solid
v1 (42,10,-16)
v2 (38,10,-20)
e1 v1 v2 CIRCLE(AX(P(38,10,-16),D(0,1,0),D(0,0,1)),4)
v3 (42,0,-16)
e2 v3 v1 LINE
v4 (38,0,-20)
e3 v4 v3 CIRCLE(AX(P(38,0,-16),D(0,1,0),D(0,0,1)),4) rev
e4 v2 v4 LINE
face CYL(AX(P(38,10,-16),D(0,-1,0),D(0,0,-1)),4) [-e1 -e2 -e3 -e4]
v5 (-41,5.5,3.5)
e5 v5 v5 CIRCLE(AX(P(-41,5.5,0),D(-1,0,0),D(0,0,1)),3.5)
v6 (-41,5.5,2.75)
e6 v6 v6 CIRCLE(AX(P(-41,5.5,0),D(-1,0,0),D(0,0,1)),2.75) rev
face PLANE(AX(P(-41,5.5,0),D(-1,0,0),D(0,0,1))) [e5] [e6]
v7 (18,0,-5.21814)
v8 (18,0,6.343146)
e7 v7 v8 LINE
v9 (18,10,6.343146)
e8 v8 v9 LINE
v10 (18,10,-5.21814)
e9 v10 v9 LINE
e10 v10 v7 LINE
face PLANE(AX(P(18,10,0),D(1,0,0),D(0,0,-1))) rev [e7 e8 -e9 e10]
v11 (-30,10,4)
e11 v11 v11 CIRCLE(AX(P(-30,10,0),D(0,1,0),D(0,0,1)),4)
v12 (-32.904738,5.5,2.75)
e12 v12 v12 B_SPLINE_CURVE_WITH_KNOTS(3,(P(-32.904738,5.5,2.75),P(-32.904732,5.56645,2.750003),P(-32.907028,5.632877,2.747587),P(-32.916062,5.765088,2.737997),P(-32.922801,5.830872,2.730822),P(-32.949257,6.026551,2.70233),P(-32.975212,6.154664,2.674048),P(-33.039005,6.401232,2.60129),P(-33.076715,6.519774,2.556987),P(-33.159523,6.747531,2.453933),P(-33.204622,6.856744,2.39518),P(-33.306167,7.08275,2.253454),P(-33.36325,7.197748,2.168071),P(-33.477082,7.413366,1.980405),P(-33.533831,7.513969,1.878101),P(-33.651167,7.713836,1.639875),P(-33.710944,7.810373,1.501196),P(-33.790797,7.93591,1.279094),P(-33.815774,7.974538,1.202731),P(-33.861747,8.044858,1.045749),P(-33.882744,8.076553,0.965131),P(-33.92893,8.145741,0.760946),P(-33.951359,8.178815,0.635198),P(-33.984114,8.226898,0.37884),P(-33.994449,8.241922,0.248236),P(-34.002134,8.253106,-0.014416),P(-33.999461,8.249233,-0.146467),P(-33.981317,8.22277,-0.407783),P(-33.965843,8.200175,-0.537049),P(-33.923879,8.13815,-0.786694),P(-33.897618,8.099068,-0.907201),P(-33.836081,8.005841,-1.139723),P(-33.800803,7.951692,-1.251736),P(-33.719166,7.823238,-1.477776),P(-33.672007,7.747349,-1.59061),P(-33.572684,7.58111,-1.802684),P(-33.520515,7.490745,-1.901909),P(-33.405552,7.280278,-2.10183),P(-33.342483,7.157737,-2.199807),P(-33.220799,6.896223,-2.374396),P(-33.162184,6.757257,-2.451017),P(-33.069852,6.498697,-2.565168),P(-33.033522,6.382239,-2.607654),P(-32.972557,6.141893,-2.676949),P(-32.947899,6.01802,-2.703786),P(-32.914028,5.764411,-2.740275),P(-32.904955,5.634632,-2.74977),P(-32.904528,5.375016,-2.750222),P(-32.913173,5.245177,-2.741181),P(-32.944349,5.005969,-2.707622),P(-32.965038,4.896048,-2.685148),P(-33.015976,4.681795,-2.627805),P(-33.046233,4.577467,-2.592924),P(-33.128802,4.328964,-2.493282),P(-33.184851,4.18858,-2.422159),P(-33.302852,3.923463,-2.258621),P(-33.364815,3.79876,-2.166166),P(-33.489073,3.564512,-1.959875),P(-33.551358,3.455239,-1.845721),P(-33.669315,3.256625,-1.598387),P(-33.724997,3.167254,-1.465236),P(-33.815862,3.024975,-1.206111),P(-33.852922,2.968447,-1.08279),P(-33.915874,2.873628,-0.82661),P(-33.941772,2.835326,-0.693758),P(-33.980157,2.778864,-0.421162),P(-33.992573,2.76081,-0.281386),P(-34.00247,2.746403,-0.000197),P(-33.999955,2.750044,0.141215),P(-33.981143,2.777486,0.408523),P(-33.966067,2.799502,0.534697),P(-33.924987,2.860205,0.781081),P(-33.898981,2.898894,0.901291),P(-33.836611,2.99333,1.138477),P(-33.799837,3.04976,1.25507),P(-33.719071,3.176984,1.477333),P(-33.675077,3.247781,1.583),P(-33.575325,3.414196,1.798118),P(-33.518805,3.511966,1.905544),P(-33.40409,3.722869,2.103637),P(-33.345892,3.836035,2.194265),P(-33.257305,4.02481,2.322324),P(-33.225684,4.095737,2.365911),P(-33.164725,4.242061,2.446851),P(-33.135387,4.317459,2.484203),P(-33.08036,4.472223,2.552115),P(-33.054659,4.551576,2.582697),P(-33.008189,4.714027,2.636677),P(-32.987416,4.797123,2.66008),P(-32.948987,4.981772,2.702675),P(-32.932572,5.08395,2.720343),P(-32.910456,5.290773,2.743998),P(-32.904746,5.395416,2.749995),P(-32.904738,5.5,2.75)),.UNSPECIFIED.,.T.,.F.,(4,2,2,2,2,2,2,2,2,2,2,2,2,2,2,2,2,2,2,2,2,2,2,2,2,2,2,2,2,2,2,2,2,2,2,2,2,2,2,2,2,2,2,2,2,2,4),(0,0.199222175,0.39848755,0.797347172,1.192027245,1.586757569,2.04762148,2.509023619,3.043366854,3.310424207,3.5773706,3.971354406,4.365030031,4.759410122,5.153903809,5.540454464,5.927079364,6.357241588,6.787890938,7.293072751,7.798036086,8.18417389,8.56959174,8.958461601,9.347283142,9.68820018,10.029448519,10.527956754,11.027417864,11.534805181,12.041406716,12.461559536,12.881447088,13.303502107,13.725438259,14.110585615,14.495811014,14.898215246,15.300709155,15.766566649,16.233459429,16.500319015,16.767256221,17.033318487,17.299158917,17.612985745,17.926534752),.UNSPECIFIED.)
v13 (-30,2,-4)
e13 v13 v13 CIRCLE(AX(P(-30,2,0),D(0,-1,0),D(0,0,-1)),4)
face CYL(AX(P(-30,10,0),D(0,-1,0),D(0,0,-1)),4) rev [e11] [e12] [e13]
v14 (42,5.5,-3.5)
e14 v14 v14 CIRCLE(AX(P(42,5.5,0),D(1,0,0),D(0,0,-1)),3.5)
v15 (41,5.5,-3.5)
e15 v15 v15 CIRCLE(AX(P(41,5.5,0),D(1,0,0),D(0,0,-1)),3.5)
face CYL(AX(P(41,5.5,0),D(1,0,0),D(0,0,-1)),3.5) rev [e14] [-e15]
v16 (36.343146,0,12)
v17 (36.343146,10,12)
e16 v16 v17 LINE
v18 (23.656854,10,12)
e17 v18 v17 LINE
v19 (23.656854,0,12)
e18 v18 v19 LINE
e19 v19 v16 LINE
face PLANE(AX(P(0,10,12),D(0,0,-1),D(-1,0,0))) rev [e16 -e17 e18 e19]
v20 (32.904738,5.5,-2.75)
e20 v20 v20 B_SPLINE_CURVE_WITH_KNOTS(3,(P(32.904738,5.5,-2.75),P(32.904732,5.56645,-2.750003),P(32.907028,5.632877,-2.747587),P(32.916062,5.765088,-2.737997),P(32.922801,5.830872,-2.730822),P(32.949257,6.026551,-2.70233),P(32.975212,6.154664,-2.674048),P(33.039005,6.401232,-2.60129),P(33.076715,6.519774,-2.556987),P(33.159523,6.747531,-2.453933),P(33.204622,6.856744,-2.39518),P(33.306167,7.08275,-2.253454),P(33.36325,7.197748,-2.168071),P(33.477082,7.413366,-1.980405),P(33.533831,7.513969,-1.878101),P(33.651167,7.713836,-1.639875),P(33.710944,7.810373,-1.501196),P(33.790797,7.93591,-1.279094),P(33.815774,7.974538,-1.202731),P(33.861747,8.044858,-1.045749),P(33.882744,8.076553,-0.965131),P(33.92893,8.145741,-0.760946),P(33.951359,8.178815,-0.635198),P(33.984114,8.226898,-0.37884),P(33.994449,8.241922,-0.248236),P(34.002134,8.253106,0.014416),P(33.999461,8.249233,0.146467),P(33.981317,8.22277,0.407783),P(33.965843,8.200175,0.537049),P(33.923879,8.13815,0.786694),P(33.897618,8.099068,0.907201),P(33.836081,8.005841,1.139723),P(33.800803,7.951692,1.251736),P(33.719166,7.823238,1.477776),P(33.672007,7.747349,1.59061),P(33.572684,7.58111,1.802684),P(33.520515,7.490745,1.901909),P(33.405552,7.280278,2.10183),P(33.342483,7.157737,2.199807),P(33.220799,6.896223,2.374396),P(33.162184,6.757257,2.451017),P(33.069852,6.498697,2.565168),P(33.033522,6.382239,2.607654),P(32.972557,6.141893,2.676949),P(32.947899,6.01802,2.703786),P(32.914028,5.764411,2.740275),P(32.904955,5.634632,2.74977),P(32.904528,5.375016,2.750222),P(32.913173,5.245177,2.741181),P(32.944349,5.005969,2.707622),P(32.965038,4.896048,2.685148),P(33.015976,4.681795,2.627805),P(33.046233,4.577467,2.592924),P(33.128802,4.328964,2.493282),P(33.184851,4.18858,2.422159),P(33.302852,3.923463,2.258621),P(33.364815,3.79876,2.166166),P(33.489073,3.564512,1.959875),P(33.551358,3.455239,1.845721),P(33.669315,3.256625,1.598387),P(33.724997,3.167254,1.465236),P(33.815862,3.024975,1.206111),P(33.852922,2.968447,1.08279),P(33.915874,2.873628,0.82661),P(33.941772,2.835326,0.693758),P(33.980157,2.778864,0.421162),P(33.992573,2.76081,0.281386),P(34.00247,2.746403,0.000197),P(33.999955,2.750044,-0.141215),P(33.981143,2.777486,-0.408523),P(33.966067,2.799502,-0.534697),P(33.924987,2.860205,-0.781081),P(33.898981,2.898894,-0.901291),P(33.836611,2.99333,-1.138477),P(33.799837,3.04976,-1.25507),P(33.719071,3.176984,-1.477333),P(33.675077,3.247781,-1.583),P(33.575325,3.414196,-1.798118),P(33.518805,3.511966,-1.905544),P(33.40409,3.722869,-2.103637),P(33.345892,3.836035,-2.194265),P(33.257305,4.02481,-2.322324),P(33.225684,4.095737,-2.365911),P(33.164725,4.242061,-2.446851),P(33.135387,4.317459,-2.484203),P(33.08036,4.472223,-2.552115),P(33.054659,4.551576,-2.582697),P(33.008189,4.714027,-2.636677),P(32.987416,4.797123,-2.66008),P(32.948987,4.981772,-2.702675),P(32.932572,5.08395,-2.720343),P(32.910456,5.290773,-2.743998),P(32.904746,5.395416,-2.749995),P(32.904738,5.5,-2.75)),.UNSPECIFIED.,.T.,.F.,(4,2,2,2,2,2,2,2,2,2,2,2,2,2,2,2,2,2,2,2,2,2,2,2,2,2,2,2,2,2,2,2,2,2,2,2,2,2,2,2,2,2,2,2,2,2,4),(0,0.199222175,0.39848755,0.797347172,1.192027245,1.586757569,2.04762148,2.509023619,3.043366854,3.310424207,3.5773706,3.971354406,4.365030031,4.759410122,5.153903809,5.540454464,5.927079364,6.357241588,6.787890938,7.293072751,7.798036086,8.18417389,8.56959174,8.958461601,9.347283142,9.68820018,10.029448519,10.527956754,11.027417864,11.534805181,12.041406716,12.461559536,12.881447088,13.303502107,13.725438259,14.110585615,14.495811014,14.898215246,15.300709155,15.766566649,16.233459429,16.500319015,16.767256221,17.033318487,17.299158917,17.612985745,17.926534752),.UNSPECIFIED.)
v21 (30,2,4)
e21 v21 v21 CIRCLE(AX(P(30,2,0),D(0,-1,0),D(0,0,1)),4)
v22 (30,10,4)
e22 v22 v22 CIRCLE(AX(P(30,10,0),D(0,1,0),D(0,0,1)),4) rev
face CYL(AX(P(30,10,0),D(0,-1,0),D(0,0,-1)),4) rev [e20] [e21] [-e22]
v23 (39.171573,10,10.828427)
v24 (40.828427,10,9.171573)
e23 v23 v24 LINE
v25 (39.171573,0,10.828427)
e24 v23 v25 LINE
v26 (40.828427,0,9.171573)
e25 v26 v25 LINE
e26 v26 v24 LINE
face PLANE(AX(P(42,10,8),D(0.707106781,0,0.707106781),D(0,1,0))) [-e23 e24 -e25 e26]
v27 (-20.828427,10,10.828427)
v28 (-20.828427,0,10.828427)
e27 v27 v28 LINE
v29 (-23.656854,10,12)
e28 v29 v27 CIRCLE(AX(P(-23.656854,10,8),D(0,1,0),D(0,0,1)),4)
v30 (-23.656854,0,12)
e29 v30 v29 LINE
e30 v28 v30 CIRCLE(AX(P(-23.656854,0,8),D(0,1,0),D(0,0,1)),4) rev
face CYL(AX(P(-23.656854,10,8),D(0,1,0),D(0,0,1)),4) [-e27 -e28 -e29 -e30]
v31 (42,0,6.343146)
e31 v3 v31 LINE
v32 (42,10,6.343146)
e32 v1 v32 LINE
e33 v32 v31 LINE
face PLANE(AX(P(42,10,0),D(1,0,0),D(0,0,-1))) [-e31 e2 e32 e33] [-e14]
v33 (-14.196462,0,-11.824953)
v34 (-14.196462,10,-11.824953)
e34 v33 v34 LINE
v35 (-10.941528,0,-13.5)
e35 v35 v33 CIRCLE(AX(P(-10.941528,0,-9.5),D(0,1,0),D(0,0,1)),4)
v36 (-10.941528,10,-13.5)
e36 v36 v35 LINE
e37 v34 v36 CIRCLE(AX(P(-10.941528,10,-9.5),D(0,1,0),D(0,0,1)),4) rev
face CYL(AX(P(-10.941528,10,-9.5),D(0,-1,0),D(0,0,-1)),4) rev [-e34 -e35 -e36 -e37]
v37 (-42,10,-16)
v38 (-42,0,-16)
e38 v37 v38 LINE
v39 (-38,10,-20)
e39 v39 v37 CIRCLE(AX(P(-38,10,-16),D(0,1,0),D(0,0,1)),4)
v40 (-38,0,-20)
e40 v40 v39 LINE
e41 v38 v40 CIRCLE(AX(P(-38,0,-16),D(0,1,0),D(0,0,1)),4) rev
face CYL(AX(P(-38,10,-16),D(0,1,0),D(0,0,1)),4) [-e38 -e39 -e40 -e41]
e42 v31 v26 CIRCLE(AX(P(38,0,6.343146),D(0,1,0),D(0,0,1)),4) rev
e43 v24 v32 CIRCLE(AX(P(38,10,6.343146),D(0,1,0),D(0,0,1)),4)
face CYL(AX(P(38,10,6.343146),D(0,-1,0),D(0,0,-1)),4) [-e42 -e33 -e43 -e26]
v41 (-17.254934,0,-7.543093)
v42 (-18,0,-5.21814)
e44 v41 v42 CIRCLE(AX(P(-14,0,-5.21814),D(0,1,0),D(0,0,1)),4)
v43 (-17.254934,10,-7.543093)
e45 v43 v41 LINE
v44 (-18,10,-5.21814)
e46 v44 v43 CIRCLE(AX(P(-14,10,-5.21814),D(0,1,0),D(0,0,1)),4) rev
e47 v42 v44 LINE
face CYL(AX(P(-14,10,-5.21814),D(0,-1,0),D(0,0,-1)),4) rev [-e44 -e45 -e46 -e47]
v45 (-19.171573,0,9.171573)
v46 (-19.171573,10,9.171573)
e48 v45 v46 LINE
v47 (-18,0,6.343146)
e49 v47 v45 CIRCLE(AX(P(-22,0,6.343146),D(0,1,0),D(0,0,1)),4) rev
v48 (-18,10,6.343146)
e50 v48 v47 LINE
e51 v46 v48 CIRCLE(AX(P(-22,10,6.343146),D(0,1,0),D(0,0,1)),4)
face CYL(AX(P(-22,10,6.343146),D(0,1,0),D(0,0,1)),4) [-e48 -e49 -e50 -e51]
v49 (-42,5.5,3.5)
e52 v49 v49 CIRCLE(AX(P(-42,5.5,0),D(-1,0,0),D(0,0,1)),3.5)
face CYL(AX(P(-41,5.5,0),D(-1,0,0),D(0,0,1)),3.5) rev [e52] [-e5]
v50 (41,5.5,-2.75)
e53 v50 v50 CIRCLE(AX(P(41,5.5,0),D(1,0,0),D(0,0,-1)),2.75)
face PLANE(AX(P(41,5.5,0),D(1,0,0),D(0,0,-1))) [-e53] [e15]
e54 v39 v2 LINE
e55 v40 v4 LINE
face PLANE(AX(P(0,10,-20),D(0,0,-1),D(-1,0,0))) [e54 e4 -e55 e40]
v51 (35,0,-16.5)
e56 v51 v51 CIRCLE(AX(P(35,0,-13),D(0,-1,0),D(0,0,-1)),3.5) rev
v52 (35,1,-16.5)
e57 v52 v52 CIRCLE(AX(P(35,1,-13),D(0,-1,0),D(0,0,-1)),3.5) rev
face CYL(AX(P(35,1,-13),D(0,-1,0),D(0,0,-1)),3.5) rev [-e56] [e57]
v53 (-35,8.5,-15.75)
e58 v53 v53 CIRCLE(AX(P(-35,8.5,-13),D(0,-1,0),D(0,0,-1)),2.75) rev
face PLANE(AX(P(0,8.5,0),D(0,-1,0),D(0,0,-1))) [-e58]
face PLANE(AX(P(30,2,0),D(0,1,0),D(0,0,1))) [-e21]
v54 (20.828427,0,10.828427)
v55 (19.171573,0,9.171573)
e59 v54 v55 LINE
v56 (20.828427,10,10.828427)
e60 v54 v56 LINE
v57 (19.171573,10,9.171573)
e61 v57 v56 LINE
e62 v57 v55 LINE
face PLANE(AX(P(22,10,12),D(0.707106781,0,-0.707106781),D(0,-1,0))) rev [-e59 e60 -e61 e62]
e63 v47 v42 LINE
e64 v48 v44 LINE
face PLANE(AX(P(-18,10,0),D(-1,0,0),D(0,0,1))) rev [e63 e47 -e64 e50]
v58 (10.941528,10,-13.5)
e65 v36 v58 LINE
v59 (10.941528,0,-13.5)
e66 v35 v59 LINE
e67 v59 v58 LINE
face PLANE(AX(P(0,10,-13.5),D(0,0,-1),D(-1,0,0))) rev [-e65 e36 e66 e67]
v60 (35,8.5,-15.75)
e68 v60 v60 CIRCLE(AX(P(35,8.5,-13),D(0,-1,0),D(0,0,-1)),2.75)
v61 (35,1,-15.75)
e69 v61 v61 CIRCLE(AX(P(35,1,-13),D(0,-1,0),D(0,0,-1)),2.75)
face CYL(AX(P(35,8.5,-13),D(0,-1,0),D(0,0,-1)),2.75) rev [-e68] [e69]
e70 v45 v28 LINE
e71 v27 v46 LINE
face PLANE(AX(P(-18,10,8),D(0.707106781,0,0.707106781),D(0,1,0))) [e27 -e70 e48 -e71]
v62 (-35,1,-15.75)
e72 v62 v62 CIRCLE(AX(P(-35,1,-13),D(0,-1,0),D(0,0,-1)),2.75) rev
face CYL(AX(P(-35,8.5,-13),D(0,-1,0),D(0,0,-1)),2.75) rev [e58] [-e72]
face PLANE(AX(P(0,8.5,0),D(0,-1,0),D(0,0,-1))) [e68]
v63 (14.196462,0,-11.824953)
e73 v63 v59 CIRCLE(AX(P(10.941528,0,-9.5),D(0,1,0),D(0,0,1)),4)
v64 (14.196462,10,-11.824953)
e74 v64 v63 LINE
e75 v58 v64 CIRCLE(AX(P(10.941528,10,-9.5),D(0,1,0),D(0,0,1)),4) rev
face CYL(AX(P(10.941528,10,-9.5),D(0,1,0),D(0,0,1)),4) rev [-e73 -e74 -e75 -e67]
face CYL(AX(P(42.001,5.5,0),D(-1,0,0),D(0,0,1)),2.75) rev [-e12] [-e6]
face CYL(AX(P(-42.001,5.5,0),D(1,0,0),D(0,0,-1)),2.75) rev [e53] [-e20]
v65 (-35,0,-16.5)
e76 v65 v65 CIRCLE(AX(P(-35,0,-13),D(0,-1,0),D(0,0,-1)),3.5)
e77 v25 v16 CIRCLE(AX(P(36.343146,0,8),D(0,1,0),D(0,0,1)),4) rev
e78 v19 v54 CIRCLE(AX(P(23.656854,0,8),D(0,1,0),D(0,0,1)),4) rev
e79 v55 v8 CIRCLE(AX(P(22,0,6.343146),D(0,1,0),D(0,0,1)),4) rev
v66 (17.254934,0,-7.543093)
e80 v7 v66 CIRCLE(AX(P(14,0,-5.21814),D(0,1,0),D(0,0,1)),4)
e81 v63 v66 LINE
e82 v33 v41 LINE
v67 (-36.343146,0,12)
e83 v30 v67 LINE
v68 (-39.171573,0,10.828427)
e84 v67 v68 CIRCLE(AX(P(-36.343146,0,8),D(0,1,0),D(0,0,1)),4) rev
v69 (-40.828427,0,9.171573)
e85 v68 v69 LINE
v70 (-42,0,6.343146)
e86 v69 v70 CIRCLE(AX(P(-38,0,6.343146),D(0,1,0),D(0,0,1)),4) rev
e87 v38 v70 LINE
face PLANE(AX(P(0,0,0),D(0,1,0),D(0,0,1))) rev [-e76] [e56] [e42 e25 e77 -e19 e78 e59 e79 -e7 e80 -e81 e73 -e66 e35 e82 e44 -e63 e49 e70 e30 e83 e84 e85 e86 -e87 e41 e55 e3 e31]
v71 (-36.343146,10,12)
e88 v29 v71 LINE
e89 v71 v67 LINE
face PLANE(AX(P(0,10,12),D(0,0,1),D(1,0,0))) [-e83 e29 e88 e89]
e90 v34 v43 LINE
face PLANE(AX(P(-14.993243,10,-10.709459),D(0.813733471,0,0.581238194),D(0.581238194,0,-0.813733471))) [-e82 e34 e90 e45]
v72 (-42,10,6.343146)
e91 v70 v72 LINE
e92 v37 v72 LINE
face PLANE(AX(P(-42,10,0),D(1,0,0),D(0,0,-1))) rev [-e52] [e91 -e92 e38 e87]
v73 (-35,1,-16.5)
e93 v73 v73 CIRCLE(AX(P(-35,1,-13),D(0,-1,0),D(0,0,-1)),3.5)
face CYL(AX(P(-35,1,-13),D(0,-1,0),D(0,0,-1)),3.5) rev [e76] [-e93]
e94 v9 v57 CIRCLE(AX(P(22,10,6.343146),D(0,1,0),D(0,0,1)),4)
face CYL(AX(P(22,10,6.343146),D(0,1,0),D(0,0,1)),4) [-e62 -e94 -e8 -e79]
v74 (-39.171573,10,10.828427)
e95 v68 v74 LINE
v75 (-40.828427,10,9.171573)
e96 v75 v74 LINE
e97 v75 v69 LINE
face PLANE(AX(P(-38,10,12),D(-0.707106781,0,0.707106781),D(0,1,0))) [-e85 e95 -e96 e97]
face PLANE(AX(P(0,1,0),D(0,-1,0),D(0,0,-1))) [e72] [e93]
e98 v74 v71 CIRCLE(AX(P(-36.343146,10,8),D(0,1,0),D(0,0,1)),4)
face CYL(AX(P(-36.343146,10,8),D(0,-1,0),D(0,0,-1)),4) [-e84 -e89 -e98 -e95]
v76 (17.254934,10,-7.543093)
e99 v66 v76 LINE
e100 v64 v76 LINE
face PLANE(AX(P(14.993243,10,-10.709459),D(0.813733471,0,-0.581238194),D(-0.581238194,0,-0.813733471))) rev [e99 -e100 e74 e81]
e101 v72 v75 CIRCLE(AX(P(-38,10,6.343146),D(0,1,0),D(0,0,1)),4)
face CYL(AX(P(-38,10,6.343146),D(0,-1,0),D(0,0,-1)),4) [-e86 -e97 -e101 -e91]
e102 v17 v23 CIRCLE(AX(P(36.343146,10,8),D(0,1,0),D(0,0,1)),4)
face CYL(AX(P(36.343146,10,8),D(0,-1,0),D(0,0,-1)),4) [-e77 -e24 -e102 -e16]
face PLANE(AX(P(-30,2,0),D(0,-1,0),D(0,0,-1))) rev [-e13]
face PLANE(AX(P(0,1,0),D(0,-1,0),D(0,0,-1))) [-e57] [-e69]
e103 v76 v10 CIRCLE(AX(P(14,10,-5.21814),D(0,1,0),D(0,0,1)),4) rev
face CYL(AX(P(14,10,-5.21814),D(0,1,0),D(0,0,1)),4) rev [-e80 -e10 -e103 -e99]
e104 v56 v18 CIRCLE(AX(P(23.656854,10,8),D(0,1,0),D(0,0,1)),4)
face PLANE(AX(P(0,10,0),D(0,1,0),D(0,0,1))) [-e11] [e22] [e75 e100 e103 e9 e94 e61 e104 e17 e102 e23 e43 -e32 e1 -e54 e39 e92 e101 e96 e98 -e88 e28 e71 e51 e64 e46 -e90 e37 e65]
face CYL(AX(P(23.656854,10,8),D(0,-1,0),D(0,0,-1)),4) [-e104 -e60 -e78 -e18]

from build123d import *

# Parameters (mm, degrees)
ESQUISSE1_R                 = 4
BOSS_EXTRU_1_DEPTH          = 10
CHANFREIN3_SIZE             = 4
CONG_2_R                    = 4
ESQUISSE3_R                 = 4
BOSS_EXTRU_2_DEPTH          = 2
ENL_V_START                 = -42
ENL_V_MAT_EXTRU_4_OUTLINE_R = 2.75
ENL_V_MAT_EXTRU_4_DEPTH     = 9.0952626
CONG_4_R                    = 4
ESQUISSE7_R                 = 2.75
ENL_V_MAT_EXTRU_5_DEPTH     = 8.5
ESQUISSE7_4_R               = 3.5
ESQUISSE7_4_R_2             = 2.75
ENL_V_MAT_EXTRU_8_DEPTH     = 1
ESQUISSE8_R                 = 3.5
ENL_V_MAT_EXTRU_9_DEPTH     = 1
ENL_V_START_2               = -1
ESQUISSE9_R                 = 3.5
ENL_V_MAT_EXTRU_10_DEPTH    = 1


# Read off the part's stored shape, not the designer's step: Enlèv. mat.-Extru.4
with BuildPart() as part:
    # Esquisse1 → Boss.-Extru.1 (new body)
    # profile 1 of 4: a face of its own
    with BuildSketch(Plane(origin=(0, 0, 0), x_dir=(1, 0, 0), z_dir=(0, 1, 0))):
        Polygon((-18, 6.5), (-18, 12), (-18, 13.5), (-13, 13.5), (0, 13.5), (0, 20), (-42, 20), (-42, 12), (-42, 0), (-42, -12), (-18, -12), align=None)
        with Locations(Location((-30, 0, 0), (0, 0, 270))):
            Circle(ESQUISSE1_R, mode=Mode.SUBTRACT)
    # profile 2 of 4: a face of its own
    with BuildSketch(Plane(origin=(0, 0, 0), x_dir=(1, 0, 0), z_dir=(0, 1, 0))):
        Polygon((0, 20), (0, 13.5), (13, 13.5), (18, 13.5), (18, 12), (18, 6.5), (18, -12), (42, -12), (42, 0), (42, 12), (42, 20), align=None)
        with Locations(Location((30, 0, 0), (0, 0, 270))):
            Circle(ESQUISSE1_R, mode=Mode.SUBTRACT)
    # profile 3 of 4: a face of its own
    with BuildSketch(Plane(origin=(0, 0, 0), x_dir=(1, 0, 0), z_dir=(0, 1, 0))):
        Polygon((-18, 13.5), (-18, 12), (-18, 6.5), (-13, 13.5), align=None)
    # profile 4 of 4: a face of its own
    with BuildSketch(Plane(origin=(0, 0, 0), x_dir=(1, 0, 0), z_dir=(0, 1, 0))):
        Polygon((18, 13.5), (13, 13.5), (18, 6.5), (18, 12), align=None)
    extrude(amount=BOSS_EXTRU_1_DEPTH)

    # Chanfrein3
    chanfrein3_edges = [part.edges().sort_by_distance(p)[0] for p in [
        (-18, 5, 12),
        (-42, 5, 12),
        (42, 5, 12),
        (18, 5, 12),
    ]]
    chamfer(chanfrein3_edges, length=CHANFREIN3_SIZE)

    # Congé2
    cong_2_edges = [part.edges().sort_by_distance(p)[0] for p in [
        (42, 5, 8),
        (22, 5, 12),
        (38, 5, 12),
        (18, 5, 8),
        (-22, 5, 12),
        (-38, 5, 12),
        (-42, 5, 8),
        (-18, 5, 8),
    ]]
    fillet(cong_2_edges, radius=CONG_2_R)

    # Esquisse3 → Boss.-Extru.2 (add)
    with BuildSketch(Plane.XZ):
        with Locations(Location((-30, 0, 0), (0, 0, 270))):
            Circle(ESQUISSE3_R)
        with Locations(Location((30, 0, 0), (0, 0, 90))):
            Circle(ESQUISSE3_R)
    extrude(amount=-BOSS_EXTRU_2_DEPTH)

    # Enlèv. mat.-Extru.4 outline → Enlèv. mat.-Extru.4 (cut)
    with BuildSketch(Plane.YZ.offset(ENL_V_START)):
        with Locations((5.5, 0)):
            Circle(ENL_V_MAT_EXTRU_4_OUTLINE_R)
    enl_v_mat_extru_4 = extrude(amount=ENL_V_MAT_EXTRU_4_DEPTH, mode=Mode.SUBTRACT)

    # Symétrie10: Enlèv. mat.-Extru.4 across plane
    add(enl_v_mat_extru_4.mirror(Plane(origin=(0, 0, 0), x_dir=(0, 0, 1), z_dir=(1, 0, 0))), mode=Mode.SUBTRACT)

    # Congé4
    cong_4_edges = [part.edges().sort_by_distance(p)[0] for p in [
        (-42, 5, -20),
        (42, 5, -20),
        (18, 5, -6.5),
        (13, 5, -13.5),
        (-13, 5, -13.5),
        (-18, 5, -6.5),
    ]]
    fillet(cong_4_edges, radius=CONG_4_R)

    # Esquisse7 → Enlèv. mat.-Extru.5 (cut)
    with BuildSketch(Plane.XZ):
        with Locations(Location((-35, -13, 0), (0, 0, 270))):
            Circle(ESQUISSE7_R)
        with Locations(Location((35, -13, 0), (0, 0, 270))):
            Circle(ESQUISSE7_R)
    extrude(amount=-ENL_V_MAT_EXTRU_5_DEPTH, mode=Mode.SUBTRACT)

    # Esquisse7<4> → Enlèv. mat.-Extru.8 (cut)
    # profile 1 of 2: a face of its own
    with BuildSketch(Plane.XZ):
        with Locations(Location((-35, -13, 0), (0, 0, 270))):
            Circle(ESQUISSE7_4_R)
        with Locations(Location((-35, -13, 0), (0, 0, 270))):
            Circle(ESQUISSE7_4_R_2, mode=Mode.SUBTRACT)
    # profile 2 of 2: a face of its own
    with BuildSketch(Plane.XZ):
        with Locations(Location((35, -13, 0), (0, 0, 270))):
            Circle(ESQUISSE7_4_R)
        with Locations(Location((35, -13, 0), (0, 0, 270))):
            Circle(ESQUISSE7_4_R_2, mode=Mode.SUBTRACT)
    extrude(amount=-ENL_V_MAT_EXTRU_8_DEPTH, mode=Mode.SUBTRACT)

    # Esquisse8 → Enlèv. mat.-Extru.9 (cut)
    with BuildSketch(Plane.ZY.offset(42)):
        with Locations((0, 5.5)):
            Circle(ESQUISSE8_R)
    extrude(amount=-ENL_V_MAT_EXTRU_9_DEPTH, mode=Mode.SUBTRACT)

    # Esquisse9 → Enlèv. mat.-Extru.10 (cut)
    with BuildSketch(Plane(origin=(42, 0, 0), x_dir=(0, 0, -1), z_dir=(1, 0, 0)).offset(ENL_V_START_2)):
        with Locations(Location((0, 5.5, 0), (0, 0, 180))):
            Circle(ESQUISSE9_R)
    extrude(amount=ENL_V_MAT_EXTRU_10_DEPTH, mode=Mode.SUBTRACT)


solid = part.part
